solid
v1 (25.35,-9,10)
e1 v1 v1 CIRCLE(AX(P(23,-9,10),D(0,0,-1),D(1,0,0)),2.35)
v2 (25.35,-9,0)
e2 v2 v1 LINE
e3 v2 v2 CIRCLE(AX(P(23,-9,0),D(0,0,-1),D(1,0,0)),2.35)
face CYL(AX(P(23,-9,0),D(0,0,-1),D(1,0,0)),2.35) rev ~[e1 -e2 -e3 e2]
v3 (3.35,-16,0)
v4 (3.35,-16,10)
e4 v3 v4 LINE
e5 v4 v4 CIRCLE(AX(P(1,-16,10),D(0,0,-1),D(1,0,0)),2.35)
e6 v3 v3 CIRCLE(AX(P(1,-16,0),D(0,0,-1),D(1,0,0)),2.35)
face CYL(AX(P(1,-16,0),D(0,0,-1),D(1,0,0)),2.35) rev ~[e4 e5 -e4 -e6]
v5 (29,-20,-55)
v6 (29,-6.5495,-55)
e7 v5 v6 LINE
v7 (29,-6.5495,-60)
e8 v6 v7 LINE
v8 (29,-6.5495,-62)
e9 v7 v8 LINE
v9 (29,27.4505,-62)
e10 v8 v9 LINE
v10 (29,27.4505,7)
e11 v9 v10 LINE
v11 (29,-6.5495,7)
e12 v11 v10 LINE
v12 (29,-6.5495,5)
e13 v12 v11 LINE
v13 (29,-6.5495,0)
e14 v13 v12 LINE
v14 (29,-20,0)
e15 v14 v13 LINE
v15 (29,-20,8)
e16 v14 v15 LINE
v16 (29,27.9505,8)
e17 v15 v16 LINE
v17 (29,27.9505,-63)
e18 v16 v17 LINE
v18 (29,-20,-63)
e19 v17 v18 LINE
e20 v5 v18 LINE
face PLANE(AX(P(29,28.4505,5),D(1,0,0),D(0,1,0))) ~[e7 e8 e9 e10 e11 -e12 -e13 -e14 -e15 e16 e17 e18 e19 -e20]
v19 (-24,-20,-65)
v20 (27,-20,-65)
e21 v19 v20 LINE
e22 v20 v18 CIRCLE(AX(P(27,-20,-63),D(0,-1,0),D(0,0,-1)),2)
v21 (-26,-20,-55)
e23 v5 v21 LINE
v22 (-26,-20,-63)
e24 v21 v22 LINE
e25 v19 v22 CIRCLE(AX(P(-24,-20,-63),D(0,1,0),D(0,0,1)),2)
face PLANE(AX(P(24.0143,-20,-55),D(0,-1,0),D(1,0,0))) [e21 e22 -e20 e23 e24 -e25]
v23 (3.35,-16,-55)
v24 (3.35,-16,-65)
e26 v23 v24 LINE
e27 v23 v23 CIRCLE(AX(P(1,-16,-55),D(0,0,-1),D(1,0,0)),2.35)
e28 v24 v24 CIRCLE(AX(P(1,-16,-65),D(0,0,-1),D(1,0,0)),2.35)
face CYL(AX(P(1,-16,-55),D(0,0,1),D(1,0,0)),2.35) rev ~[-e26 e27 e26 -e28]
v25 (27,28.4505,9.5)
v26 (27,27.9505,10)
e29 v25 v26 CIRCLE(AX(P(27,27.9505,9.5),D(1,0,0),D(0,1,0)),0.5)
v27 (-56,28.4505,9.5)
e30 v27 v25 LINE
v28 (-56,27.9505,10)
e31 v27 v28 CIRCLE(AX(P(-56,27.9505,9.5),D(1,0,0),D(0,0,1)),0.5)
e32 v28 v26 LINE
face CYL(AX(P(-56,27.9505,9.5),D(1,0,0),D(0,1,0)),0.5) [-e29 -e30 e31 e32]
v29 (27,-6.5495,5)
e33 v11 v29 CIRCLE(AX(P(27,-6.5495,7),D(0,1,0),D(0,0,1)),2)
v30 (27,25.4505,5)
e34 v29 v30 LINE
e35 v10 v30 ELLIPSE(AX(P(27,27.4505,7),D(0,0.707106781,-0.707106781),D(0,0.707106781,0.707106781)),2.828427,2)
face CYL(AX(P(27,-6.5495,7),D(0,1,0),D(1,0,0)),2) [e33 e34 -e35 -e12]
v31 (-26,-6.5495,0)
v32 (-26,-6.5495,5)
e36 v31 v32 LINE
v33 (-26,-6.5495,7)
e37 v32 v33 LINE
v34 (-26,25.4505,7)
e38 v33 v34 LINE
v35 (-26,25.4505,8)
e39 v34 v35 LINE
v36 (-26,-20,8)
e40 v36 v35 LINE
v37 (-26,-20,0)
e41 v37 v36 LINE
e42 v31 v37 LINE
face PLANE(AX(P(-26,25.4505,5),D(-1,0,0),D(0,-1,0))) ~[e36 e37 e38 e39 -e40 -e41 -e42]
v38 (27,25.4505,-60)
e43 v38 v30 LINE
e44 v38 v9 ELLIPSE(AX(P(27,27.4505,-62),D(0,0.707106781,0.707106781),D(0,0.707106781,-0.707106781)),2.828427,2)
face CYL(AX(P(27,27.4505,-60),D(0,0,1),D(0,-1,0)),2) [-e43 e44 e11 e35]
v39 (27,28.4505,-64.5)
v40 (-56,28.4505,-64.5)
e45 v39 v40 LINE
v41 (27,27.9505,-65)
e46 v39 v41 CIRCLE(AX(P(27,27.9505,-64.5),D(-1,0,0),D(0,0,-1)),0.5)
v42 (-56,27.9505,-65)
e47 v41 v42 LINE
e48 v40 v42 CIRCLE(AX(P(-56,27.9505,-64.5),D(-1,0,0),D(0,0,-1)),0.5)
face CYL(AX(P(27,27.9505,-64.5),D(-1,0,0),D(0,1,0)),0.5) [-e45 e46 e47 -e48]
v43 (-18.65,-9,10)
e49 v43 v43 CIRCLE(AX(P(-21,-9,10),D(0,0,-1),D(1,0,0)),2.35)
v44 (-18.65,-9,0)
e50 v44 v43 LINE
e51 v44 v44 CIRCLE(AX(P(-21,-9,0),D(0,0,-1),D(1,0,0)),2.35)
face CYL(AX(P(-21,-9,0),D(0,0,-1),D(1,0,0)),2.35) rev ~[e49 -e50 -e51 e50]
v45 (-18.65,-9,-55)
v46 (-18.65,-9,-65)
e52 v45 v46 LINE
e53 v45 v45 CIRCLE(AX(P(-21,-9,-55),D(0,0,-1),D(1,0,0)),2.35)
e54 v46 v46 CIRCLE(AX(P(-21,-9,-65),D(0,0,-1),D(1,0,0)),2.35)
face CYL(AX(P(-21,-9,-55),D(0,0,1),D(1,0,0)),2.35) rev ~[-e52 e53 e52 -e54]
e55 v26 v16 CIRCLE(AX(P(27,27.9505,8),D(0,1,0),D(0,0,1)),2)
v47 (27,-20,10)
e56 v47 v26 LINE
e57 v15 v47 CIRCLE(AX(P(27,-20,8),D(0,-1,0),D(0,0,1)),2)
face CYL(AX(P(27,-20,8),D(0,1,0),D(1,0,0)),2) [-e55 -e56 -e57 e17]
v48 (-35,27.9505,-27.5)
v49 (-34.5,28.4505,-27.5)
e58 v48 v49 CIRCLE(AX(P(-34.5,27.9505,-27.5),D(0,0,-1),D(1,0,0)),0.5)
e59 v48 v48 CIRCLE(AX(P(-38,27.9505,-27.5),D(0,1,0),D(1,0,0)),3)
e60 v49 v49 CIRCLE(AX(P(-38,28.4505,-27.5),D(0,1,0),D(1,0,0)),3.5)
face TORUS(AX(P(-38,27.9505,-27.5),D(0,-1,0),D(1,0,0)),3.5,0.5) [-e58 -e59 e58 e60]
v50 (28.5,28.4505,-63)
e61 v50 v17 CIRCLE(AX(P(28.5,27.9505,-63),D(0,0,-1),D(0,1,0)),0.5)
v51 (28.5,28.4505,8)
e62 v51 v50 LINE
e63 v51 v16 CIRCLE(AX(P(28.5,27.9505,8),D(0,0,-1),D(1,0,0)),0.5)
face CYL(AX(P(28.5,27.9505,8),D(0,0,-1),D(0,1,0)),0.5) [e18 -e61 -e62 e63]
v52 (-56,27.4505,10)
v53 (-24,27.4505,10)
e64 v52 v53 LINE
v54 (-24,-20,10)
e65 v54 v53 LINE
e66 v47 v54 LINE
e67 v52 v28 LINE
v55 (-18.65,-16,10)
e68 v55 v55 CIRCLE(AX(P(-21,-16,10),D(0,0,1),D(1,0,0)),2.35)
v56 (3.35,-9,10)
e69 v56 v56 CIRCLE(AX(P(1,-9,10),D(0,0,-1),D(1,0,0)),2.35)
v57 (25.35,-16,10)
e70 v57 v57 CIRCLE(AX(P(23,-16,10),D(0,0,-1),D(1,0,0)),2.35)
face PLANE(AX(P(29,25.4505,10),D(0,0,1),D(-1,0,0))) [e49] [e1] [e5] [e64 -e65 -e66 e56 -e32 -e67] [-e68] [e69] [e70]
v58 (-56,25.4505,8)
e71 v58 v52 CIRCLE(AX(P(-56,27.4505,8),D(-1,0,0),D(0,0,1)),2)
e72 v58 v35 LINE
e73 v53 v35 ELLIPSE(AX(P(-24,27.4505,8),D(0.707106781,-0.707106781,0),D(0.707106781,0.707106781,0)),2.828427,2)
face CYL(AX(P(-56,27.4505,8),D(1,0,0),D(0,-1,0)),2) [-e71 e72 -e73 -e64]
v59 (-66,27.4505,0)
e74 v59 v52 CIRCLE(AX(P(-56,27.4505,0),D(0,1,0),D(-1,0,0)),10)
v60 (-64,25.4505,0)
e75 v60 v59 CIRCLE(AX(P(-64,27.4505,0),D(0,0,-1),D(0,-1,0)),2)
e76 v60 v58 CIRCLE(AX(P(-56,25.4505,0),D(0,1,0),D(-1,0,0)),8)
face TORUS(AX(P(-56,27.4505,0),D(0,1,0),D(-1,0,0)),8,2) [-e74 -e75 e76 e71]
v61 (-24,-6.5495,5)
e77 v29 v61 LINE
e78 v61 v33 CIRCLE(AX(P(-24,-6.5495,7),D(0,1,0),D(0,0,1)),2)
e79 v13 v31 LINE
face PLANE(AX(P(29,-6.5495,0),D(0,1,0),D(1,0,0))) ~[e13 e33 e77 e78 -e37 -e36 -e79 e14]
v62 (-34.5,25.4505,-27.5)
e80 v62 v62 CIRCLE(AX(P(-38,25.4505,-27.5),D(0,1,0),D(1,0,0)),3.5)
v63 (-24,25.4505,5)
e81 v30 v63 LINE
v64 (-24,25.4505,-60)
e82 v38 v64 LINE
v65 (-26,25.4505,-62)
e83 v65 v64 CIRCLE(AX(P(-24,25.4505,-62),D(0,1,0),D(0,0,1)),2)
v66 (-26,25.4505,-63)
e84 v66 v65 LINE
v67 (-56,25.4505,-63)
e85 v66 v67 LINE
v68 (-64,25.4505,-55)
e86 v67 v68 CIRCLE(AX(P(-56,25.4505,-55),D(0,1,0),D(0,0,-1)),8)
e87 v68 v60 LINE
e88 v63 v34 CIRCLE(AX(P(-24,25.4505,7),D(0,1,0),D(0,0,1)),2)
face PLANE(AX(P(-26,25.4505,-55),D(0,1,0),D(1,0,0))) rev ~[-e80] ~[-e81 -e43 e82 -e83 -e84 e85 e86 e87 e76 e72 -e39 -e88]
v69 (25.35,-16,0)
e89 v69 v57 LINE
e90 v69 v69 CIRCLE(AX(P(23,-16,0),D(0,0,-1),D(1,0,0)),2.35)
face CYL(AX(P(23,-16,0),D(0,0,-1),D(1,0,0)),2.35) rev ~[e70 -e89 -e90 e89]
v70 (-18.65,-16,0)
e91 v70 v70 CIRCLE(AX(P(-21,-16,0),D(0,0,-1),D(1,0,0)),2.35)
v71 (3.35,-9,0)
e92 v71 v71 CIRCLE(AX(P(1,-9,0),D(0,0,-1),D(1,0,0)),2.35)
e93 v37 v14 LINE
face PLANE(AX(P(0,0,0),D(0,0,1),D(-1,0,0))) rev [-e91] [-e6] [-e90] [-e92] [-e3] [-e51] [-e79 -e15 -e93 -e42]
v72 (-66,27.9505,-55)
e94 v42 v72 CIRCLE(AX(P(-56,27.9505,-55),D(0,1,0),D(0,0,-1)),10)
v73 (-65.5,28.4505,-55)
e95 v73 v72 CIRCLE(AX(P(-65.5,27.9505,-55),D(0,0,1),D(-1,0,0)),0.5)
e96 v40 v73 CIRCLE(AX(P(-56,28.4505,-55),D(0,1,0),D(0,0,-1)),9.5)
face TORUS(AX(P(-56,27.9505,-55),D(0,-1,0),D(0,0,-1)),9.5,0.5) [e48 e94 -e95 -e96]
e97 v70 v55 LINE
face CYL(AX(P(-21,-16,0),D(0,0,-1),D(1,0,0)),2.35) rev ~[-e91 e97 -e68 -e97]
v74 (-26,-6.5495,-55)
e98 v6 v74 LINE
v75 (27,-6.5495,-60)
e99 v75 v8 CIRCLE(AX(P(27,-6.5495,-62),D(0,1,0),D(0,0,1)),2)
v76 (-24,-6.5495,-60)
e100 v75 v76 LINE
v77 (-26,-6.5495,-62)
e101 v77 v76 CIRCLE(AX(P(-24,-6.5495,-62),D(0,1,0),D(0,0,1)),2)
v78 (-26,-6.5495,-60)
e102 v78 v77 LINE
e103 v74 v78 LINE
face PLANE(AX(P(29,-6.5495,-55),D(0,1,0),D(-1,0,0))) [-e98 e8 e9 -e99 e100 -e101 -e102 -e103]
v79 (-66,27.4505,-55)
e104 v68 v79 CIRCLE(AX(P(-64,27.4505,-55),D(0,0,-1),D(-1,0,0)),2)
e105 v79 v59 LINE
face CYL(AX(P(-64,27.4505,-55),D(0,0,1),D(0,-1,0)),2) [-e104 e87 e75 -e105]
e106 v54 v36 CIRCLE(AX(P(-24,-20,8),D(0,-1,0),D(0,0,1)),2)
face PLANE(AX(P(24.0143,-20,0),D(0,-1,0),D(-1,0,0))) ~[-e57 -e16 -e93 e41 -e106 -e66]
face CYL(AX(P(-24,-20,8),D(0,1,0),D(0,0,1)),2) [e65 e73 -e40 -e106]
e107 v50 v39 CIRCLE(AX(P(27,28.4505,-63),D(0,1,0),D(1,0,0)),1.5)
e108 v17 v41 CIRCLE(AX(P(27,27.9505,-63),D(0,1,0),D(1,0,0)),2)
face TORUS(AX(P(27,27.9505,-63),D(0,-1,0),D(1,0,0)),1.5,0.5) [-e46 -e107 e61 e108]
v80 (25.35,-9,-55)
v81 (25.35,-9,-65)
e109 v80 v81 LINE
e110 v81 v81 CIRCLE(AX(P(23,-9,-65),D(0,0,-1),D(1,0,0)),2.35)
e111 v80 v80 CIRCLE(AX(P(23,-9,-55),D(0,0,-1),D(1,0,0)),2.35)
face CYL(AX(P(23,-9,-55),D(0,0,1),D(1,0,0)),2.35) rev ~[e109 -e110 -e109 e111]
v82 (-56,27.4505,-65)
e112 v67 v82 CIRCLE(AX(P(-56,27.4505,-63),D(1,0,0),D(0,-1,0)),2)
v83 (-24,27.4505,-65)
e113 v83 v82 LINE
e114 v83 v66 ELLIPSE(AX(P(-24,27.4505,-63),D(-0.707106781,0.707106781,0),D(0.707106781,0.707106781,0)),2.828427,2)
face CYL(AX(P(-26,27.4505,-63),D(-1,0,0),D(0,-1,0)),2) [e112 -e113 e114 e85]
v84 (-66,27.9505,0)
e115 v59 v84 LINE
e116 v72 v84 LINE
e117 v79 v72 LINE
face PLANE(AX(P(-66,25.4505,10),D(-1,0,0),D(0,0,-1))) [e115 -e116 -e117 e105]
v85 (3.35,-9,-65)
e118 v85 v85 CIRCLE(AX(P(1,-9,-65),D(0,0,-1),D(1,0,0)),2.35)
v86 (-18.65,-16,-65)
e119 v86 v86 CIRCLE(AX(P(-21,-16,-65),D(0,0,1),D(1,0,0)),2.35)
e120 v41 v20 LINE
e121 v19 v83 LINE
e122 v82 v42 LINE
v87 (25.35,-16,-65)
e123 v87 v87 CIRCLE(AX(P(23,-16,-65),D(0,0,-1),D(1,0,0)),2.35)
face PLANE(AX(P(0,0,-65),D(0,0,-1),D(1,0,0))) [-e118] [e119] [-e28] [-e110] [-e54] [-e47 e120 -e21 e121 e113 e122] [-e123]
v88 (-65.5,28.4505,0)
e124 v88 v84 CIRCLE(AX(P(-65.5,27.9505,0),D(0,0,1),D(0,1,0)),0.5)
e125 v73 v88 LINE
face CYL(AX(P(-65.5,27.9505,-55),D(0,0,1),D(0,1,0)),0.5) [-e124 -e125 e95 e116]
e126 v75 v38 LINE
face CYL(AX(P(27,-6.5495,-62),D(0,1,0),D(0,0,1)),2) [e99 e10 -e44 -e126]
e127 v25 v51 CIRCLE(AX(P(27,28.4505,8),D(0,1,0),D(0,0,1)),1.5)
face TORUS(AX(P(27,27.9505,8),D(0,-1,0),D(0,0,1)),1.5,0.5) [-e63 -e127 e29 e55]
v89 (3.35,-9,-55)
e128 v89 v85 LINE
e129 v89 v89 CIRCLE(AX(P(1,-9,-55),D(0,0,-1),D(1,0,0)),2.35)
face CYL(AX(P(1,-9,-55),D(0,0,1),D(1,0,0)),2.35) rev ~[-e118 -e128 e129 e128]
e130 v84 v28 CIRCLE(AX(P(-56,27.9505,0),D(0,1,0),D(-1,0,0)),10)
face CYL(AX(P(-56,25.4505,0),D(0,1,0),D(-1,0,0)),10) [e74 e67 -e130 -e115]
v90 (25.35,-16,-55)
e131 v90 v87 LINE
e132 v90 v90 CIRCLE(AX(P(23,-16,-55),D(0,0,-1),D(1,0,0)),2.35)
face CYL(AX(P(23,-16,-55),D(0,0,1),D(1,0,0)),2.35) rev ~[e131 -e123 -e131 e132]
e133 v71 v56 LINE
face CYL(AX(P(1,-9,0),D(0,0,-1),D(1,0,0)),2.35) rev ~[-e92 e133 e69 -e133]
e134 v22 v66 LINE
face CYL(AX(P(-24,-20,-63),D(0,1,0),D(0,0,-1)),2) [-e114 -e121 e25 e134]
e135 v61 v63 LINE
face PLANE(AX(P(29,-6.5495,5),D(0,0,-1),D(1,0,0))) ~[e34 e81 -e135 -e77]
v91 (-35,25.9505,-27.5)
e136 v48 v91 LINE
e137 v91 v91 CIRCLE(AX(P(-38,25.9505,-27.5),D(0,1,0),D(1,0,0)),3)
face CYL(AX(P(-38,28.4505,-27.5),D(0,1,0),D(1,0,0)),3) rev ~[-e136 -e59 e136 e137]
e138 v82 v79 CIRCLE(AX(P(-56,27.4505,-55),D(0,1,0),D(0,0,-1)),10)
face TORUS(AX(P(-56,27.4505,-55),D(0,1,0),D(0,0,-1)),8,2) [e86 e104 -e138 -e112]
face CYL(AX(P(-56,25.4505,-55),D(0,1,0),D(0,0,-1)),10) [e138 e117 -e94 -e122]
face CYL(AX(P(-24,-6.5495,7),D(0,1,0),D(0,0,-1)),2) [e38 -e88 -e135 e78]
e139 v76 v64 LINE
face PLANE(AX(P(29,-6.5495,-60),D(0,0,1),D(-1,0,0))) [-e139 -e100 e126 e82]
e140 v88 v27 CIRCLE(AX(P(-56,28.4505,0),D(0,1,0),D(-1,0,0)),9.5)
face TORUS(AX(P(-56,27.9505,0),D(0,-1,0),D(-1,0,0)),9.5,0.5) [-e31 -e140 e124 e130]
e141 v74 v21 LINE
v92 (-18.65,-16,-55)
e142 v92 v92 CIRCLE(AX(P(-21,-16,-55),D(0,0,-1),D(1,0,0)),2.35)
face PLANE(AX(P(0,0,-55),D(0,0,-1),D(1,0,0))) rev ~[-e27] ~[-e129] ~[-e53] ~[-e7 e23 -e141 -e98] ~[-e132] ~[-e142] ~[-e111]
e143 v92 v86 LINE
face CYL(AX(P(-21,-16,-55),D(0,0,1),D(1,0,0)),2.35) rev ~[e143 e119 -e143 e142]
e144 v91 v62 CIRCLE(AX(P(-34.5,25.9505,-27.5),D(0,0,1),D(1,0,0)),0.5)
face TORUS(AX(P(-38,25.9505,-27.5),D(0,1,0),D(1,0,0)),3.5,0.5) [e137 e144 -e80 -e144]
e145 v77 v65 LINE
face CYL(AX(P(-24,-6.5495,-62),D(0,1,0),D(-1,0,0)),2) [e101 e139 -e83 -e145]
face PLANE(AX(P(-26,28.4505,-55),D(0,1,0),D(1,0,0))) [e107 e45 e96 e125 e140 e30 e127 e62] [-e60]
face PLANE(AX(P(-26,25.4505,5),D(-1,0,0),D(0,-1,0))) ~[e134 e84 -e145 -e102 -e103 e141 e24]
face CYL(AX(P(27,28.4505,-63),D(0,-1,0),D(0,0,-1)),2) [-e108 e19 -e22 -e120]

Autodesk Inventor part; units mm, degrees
ref_plane "YZ Plane" through (0, 0, 0) normal (1, 0, 0) x (0, 1, 0)
ref_plane "XZ Plane" through (0, 0, 0) normal (0, 1, 0) x (-1, 0, 0)
ref_plane "Work Plane1" through (0, 0, -55) normal (0, 0, -1) x (1, 0, 0)
sketch "Sketch2" plane through (0, 0, -55) normal (0, 0, -1) x (1, 0, 0)
  circle A0 centre (23, 9) radius 2.35 projected
  circle A1 centre (1, 9) radius 2.35 projected
  circle A2 centre (-21, 9) radius 2.35 projected
  circle A3 centre (-21, 16) radius 2.35 projected
  circle A4 centre (1, 16) radius 2.35 projected
  circle A5 centre (23, 16) radius 2.35 projected
  circle A6 centre (-66, 12.5) radius 1.6 projected
  circle A7 centre (63, 29.65) radius 1.6 projected
  arc A8 (58.9857, 35) -> (49.7248, 32.4349) centre (58.9857, 17) ccw projected
  line L0 (33.2752, 22.5651) -> (49.7248, 32.4349) projected
  arc A9 (24.0143, 20) -> (33.2752, 22.5651) centre (24.0143, 38) ccw projected
  line L1 (-71, 20) -> (24.0143, 20) projected
  arc A10 (-71, 20) -> (-81, 10) centre (-71, 10) ccw projected
  line L2 (-81, 6.5495) -> (-81, 10) projected
  line L3 (-80.0877, 6.5495) -> (-81, 6.5495) projected
  line L4 (81, 6.5495) -> (-80.0877, 6.5495) projected
  line L5 (81, 20) -> (81, 6.5495) projected
  arc A11 (81, 20) -> (66, 35) centre (66, 20) ccw projected
  line L6 (58.9857, 35) -> (66, 35) projected
  line L7 (-21, 16) -> (-26, 16)
  line L8 (-21, 16) -> (-16, 16) construction
  line L9 (-26, 16) -> (-26, 20)
  line L10 (-26, 20) -> (29, 20)
  line L11 (29, 20) -> (29, 6.5495)
  line L12 (29, 6.5495) -> (-26, 6.5495)
  line L13 (-26, 6.5495) -> (-26, 20)
  point P0 (0, 0)
  dimension "d0" = 5
  dimension "d1" = 180
  dimension "d2" = 55
extrude "Extrusion1" add sketch "Sketch2" along normal blind 10 contours L10 L11 L4 L13 L9 L1
sketch "Sketch3" plane through (-26, -6.5495, -55) normal (0, 1, 0) x (1, 0, 0)
  line L0 (0, 0) -> (0, 10) projected
  line L1 (0, 10) -> (55, 10)
  line L2 (55, 10) -> (55, 5)
  line L3 (55, 5) -> (0, 5)
  line L4 (0, 5) -> (0, 10)
  point P0 (26, -55)
  dimension "d5" = 55
  dimension "d6" = 5
extrude "Extrusion2" add sketch "Sketch3" along normal blind 35
sketch "Sketch4" plane through (-26, -6.5495, -60) normal (0, 0, 1) x (1, 0, 0)
  line L0 (0, -13.4505) -> (0, 35) projected
  line L1 (0, 35) -> (55, 35)
  line L2 (55, 35) -> (55, 32)
  line L3 (55, 32) -> (0, 32)
  line L4 (0, 32) -> (0, 35)
  point P0 (26, 6.5495)
  dimension "d9" = 55
  dimension "d10" = 3
ref_plane "Work Plane2" through (-91.43, -48.7723, -27.5) normal (0, 0, 1) x (1, 0, 0)
extrude "Extrusion3" add sketch "Sketch4" along normal up to surface (32.5 mm away)
ref_plane "Work Plane3" through (-26, -6.5495, -27.5) normal (0, 0, 1) x (1, 0, 0)
mirror "Mirror1" about plane through (-26, -6.5495, -27.5) normal (0, 0, 1) of "Extrusion3", "Extrusion2", "Extrusion1"
ref_plane "Work Plane4" through (-26, 25.4505, -55) normal (0, 1, 0) x (1, 0, 0)
sketch "Sketch5" plane through (-26, 25.4505, -55) normal (0, 1, 0) x (1, 0, 0)
  line L0 (55, 5) -> (55, -60) projected
  line L1 (55, -27.5) -> (55, -65)
  line L2 (55, -27.5) -> (92.5, -27.5) construction
  line L3 (55, -65) -> (-40, -65)
  line L4 (-40, -65) -> (-40, 10)
  line L5 (-40, 10) -> (55, 10)
  line L6 (55, 10) -> (55, -65)
  line L7 (55, -65) -> (0, -65) projected
  line L8 (55, 10) -> (0, 10) projected
  line L9 (0, 10) -> (0, -65) projected
  line L10 (-12, 10) -> (-12, -65) construction
  line L11 (-48.9083, -27.5) -> (104.1186, -27.5) construction
  circle A0 centre (-12, -27.5) radius 3
  point P0 (26, -55)
  dimension "d16" = 90
  dimension "d21" = 0
  dimension "d22" = 0
  dimension "d23" = 40
  dimension "d24" = 28
  dimension "d25" = 6
extrude "Extrusion4" add sketch "Sketch5" along normal blind 3 contours L0 L1 L3 L9 L5 L6 | L9 L3 L4 L5 | A0
sketch "Sketch6" plane through (-26, 28.4505, -55) normal (0, 1, 0) x (1, 0, 0)
  point P0 (26, -55)
sketch "Sketch7" plane through (-26, 25.4505, -55) normal (0, 1, 0) x (1, 0, 0)
  point P0 (26, -55)
sketch "Sketch8" plane through (-26, 28.4505, -55) normal (0, 1, 0) x (1, 0, 0)
  line L0 (55, 10) -> (-40, 10) projected
  line L1 (-40, -65) -> (55, -65) projected
  line L2 (-12, 10) -> (-12, -65) construction
  line L3 (-40, 10) -> (-40, -65) construction
  line L4 (-40, -27.5) -> (55, -27.5) construction
  line L5 (55, 5) -> (55, -60) construction
  circle A0 centre (-12, -27.5) radius 3
  point P0 (26, -55)
  dimension "d26" = 6
extrude "Extrusion5" cut sketch "Sketch8" against normal blind 3 from surface at 0
fillet "Fillet1" radius 0.5 1 edges at (-41, 28.4505, -27.5)
fillet "Fillet2" radius 0.5 1 edges at (-41, 25.4505, -27.5)
fillet "Fillet3" radius 10 2 edges at (-66, 26.9505, 10) (-66, 26.9505, -65)
fillet "Fillet4" radius 2 12 edges at (-26, 9.4505, 5) (-26, 2.7253, 10) (29, 9.4505, 5) (29, 9.4505, -60) (-26, 2.7253, -65) (-26, 9.4505, -60) (-63.0711, 25.4505, -62.0711) (-66, 25.4505, -27.5) (-63.0711, 25.4505, 7.0711) (-41, 25.4505, 10) (-41, 25.4505, -65) (29, 25.4505, -27.5)
fillet "Fillet5" radius 2 2 edges at (29, 4.2253, -65) (29, 4.2253, 10)
fillet "Fillet6" radius 0.5 8 edges at (-63.0711, 28.4505, -62.0711) (-66, 28.4505, -27.5) (-63.0711, 28.4505, 7.0711) (-14.5, 28.4505, 10) (28.4142, 28.4505, 9.4142) (29, 28.4505, -27.5) (28.4142, 28.4505, -64.4142) (-14.5, 28.4505, -65)
properties part number "apriltag_head"
